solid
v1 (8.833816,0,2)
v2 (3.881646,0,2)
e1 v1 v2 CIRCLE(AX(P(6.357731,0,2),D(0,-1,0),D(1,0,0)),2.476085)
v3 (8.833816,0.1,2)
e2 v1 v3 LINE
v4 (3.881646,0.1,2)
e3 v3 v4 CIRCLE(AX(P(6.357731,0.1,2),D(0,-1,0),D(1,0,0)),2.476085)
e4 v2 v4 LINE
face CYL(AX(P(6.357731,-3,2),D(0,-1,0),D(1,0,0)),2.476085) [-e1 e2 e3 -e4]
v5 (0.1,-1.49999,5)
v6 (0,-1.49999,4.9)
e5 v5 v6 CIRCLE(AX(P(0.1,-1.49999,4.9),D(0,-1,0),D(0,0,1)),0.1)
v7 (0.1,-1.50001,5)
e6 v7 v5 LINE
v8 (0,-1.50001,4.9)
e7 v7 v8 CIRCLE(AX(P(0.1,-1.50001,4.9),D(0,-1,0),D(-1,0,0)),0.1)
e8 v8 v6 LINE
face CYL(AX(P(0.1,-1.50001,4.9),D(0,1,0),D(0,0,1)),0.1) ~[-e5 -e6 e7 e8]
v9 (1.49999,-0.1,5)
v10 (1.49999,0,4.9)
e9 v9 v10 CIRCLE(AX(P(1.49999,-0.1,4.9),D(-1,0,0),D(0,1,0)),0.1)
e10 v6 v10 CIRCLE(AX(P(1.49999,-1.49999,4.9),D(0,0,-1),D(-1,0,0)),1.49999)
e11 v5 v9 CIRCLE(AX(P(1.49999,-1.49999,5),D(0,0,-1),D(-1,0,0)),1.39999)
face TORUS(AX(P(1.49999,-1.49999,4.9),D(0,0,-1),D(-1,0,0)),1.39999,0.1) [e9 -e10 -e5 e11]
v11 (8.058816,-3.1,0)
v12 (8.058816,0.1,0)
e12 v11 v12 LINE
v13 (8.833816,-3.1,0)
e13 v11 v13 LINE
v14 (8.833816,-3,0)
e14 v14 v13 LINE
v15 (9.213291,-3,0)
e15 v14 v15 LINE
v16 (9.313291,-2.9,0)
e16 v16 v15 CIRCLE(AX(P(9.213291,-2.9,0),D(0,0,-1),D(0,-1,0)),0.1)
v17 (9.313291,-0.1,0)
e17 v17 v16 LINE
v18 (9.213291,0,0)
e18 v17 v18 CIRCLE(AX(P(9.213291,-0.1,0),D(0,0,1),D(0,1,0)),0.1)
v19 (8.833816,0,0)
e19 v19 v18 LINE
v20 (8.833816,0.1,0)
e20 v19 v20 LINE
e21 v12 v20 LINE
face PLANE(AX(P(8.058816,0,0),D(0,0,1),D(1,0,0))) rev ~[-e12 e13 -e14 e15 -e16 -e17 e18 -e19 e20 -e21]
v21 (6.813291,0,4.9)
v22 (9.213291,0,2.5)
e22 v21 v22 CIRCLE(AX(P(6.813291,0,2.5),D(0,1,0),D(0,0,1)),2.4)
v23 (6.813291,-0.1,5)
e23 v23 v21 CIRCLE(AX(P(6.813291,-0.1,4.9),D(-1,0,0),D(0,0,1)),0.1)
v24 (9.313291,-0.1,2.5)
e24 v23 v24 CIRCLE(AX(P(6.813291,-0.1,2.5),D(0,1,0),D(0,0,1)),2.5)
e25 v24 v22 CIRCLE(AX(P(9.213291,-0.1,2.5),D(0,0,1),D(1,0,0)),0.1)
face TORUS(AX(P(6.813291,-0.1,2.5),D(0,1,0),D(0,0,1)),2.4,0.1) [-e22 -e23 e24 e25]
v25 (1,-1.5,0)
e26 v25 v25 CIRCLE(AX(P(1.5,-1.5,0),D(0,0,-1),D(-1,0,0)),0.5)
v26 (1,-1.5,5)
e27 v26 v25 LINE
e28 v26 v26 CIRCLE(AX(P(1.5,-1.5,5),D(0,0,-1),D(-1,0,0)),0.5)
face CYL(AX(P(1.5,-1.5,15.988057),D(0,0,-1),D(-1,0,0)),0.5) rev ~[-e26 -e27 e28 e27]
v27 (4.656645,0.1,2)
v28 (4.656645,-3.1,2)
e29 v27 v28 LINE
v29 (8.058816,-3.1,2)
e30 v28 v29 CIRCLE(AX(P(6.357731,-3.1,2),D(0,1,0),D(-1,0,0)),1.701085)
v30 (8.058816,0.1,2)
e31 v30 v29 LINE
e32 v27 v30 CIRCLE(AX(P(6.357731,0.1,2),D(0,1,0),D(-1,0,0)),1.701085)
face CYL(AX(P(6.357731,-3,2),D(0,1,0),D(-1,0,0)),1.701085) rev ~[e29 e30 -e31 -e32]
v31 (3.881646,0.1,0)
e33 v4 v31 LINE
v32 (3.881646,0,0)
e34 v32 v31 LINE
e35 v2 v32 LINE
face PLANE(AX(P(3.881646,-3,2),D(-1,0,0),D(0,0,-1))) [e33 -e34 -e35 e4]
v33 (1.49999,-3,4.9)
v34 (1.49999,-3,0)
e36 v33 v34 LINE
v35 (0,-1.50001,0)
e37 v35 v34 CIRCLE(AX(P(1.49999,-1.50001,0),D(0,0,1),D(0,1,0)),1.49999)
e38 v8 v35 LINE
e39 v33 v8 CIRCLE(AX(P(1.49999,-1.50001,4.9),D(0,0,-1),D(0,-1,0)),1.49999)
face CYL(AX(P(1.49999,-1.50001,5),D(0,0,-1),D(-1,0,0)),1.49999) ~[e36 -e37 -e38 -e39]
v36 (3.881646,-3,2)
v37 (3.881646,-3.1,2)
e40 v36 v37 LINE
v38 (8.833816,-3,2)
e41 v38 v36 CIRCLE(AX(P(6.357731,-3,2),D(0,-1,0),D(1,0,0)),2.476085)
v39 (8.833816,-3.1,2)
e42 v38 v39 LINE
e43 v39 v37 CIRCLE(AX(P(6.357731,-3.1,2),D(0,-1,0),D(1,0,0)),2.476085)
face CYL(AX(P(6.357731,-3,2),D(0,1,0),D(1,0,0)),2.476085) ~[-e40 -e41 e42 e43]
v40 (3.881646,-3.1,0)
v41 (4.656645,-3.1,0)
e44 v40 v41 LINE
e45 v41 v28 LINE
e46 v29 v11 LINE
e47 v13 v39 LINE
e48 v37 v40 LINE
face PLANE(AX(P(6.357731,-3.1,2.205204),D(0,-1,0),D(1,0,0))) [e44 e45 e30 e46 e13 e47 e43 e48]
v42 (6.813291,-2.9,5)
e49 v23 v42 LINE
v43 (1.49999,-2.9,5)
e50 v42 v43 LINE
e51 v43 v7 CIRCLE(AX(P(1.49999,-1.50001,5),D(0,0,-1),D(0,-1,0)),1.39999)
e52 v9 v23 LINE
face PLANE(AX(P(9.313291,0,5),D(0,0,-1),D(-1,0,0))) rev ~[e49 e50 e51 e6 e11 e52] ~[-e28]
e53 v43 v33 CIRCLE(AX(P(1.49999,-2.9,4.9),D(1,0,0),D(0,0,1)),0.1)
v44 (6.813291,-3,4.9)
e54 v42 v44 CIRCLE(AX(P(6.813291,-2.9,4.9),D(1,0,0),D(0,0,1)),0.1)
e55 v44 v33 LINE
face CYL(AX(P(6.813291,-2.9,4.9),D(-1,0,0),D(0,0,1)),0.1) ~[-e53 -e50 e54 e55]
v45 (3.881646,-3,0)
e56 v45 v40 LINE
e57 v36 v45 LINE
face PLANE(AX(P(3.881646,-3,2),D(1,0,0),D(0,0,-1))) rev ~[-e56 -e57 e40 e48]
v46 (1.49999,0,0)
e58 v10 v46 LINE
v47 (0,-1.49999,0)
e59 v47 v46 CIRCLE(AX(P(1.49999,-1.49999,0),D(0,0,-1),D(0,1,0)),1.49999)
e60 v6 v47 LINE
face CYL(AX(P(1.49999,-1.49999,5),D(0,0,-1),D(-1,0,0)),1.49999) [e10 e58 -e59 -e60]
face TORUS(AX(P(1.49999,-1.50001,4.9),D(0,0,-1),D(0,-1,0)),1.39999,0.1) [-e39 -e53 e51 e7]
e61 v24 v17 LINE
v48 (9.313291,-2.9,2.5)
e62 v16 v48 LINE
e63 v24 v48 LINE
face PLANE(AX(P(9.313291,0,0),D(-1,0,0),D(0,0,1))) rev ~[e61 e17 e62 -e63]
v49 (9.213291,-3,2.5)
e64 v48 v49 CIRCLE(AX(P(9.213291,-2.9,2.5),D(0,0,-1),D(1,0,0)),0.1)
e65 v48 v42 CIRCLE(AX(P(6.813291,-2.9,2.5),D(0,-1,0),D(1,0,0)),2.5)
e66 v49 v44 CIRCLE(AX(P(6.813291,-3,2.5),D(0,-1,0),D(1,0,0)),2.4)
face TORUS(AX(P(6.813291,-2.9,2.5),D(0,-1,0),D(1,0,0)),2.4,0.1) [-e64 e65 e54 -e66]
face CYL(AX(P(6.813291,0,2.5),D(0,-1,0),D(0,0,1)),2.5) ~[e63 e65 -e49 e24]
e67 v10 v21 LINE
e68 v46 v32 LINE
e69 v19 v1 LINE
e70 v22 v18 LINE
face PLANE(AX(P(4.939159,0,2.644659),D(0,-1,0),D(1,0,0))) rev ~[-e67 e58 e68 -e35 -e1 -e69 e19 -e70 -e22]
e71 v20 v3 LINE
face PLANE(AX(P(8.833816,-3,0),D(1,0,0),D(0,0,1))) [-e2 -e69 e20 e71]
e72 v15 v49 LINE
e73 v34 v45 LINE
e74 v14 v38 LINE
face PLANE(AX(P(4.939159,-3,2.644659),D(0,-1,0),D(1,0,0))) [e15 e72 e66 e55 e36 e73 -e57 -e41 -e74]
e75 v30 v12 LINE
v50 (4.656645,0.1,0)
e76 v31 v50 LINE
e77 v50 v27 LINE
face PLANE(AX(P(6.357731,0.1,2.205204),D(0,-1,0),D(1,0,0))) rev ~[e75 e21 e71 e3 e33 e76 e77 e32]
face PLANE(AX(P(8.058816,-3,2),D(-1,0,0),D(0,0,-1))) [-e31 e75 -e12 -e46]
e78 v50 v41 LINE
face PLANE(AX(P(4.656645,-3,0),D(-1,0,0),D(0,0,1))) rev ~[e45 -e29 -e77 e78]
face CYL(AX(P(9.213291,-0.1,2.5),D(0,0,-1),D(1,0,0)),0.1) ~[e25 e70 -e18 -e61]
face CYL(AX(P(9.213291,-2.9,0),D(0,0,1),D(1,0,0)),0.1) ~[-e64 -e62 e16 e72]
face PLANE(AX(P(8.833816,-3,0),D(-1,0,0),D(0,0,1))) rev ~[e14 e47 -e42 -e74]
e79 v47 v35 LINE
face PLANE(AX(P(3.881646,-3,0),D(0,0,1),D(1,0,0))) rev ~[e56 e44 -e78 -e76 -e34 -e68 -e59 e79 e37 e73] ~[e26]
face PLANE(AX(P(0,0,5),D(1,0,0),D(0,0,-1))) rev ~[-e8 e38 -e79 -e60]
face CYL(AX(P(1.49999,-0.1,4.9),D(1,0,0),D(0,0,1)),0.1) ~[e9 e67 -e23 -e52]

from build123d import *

# Parameters (mm, degrees)
F1_DEPTH      = 3
F2_R          = 1.49999
F4_D          = 1
F5_R          = 2.5
F6_R          = 0.1
F8_DEPTH      = 0.1
F8_DEPTH_BACK = 3.1


# Not quite as in the source:
# - a fillet or chamfer is up to 0.001 mm smaller than in the source, because OpenCascade refuses the exact size


with BuildPart() as f1:
    # F0 (on Front) → F1 (new body)
    with BuildSketch(Plane.XZ):
        with BuildLine():
            Line((0, 5), (0, 0))
            Line((0, 0), (4.6566454311, 0))
            Line((4.6566454311, 0), (4.6566454311, 2))
            ThreePointArc((4.6566454311, 2), (6.3577308128, 3.7010853817), (8.0588161945, 2))
            Line((8.0588161945, 2), (8.0588161945, 0))
            Line((8.0588161945, 0), (9.3132908622, 0))
            Line((9.3132908622, 0), (9.3132908622, 5))
            Line((9.3132908622, 5), (0, 5))
        make_face()
    extrude(amount=F1_DEPTH)

    # F2 (radius 1.5 in the source; OpenCascade refuses exactly that, so slightly less here)
    f2_edges = [f1.edges().sort_by_distance(p)[0] for p in [
        (0, 0, 2.5),
        (0, -3, 2.5),
    ]]
    fillet(f2_edges, radius=F2_R)

    # F4 (through all)
    with Locations(Plane.XY.offset(5)):
        with Locations((1.5, -1.5)):
            Hole(F4_D / 2)

    # F5
    f5_edges = [f1.edges().sort_by_distance(p)[0] for p in [
        (9.313291, -1.5, 5),
    ]]
    fillet(f5_edges, radius=F5_R)

    # F6
    f6_edges = [f1.edges().sort_by_distance(p)[0] for p in [
        (4.15664, -3, 5),
        (8.581058, -3, 4.267767),
        (9.313291, -3, 1.25),
        (9.313291, 0, 1.25),
        (8.581058, 0, 4.267767),
        (4.15664, 0, 5),
    ]]
    fillet(f6_edges, radius=F6_R)

    # F7 (on face) → F8 (join, two sides)
    with BuildSketch(Plane.XZ.offset(3)) as f8_sk:
        with BuildLine():
            Line((3.8816455076, 2), (3.8816455076, 0))
            Line((3.8816455076, 0), (4.6566454311, 0))
            Line((4.6566454311, 0), (4.6566454311, 2))
            ThreePointArc((4.6566454311, 2), (6.3577308128, 3.7010853817), (8.0588161945, 2))
            Line((8.0588161945, 2), (8.0588161945, 0))
            Line((8.0588161945, 0), (8.833816118, 0))
            Line((8.833816118, 0), (8.833816118, 2))
            ThreePointArc((8.833816118, 2), (6.3577308128, 4.4760853052), (3.8816455076, 2))
        make_face()
    extrude(amount=F8_DEPTH)
    extrude(f8_sk.sketch, amount=-F8_DEPTH_BACK)


solid = f1.part
